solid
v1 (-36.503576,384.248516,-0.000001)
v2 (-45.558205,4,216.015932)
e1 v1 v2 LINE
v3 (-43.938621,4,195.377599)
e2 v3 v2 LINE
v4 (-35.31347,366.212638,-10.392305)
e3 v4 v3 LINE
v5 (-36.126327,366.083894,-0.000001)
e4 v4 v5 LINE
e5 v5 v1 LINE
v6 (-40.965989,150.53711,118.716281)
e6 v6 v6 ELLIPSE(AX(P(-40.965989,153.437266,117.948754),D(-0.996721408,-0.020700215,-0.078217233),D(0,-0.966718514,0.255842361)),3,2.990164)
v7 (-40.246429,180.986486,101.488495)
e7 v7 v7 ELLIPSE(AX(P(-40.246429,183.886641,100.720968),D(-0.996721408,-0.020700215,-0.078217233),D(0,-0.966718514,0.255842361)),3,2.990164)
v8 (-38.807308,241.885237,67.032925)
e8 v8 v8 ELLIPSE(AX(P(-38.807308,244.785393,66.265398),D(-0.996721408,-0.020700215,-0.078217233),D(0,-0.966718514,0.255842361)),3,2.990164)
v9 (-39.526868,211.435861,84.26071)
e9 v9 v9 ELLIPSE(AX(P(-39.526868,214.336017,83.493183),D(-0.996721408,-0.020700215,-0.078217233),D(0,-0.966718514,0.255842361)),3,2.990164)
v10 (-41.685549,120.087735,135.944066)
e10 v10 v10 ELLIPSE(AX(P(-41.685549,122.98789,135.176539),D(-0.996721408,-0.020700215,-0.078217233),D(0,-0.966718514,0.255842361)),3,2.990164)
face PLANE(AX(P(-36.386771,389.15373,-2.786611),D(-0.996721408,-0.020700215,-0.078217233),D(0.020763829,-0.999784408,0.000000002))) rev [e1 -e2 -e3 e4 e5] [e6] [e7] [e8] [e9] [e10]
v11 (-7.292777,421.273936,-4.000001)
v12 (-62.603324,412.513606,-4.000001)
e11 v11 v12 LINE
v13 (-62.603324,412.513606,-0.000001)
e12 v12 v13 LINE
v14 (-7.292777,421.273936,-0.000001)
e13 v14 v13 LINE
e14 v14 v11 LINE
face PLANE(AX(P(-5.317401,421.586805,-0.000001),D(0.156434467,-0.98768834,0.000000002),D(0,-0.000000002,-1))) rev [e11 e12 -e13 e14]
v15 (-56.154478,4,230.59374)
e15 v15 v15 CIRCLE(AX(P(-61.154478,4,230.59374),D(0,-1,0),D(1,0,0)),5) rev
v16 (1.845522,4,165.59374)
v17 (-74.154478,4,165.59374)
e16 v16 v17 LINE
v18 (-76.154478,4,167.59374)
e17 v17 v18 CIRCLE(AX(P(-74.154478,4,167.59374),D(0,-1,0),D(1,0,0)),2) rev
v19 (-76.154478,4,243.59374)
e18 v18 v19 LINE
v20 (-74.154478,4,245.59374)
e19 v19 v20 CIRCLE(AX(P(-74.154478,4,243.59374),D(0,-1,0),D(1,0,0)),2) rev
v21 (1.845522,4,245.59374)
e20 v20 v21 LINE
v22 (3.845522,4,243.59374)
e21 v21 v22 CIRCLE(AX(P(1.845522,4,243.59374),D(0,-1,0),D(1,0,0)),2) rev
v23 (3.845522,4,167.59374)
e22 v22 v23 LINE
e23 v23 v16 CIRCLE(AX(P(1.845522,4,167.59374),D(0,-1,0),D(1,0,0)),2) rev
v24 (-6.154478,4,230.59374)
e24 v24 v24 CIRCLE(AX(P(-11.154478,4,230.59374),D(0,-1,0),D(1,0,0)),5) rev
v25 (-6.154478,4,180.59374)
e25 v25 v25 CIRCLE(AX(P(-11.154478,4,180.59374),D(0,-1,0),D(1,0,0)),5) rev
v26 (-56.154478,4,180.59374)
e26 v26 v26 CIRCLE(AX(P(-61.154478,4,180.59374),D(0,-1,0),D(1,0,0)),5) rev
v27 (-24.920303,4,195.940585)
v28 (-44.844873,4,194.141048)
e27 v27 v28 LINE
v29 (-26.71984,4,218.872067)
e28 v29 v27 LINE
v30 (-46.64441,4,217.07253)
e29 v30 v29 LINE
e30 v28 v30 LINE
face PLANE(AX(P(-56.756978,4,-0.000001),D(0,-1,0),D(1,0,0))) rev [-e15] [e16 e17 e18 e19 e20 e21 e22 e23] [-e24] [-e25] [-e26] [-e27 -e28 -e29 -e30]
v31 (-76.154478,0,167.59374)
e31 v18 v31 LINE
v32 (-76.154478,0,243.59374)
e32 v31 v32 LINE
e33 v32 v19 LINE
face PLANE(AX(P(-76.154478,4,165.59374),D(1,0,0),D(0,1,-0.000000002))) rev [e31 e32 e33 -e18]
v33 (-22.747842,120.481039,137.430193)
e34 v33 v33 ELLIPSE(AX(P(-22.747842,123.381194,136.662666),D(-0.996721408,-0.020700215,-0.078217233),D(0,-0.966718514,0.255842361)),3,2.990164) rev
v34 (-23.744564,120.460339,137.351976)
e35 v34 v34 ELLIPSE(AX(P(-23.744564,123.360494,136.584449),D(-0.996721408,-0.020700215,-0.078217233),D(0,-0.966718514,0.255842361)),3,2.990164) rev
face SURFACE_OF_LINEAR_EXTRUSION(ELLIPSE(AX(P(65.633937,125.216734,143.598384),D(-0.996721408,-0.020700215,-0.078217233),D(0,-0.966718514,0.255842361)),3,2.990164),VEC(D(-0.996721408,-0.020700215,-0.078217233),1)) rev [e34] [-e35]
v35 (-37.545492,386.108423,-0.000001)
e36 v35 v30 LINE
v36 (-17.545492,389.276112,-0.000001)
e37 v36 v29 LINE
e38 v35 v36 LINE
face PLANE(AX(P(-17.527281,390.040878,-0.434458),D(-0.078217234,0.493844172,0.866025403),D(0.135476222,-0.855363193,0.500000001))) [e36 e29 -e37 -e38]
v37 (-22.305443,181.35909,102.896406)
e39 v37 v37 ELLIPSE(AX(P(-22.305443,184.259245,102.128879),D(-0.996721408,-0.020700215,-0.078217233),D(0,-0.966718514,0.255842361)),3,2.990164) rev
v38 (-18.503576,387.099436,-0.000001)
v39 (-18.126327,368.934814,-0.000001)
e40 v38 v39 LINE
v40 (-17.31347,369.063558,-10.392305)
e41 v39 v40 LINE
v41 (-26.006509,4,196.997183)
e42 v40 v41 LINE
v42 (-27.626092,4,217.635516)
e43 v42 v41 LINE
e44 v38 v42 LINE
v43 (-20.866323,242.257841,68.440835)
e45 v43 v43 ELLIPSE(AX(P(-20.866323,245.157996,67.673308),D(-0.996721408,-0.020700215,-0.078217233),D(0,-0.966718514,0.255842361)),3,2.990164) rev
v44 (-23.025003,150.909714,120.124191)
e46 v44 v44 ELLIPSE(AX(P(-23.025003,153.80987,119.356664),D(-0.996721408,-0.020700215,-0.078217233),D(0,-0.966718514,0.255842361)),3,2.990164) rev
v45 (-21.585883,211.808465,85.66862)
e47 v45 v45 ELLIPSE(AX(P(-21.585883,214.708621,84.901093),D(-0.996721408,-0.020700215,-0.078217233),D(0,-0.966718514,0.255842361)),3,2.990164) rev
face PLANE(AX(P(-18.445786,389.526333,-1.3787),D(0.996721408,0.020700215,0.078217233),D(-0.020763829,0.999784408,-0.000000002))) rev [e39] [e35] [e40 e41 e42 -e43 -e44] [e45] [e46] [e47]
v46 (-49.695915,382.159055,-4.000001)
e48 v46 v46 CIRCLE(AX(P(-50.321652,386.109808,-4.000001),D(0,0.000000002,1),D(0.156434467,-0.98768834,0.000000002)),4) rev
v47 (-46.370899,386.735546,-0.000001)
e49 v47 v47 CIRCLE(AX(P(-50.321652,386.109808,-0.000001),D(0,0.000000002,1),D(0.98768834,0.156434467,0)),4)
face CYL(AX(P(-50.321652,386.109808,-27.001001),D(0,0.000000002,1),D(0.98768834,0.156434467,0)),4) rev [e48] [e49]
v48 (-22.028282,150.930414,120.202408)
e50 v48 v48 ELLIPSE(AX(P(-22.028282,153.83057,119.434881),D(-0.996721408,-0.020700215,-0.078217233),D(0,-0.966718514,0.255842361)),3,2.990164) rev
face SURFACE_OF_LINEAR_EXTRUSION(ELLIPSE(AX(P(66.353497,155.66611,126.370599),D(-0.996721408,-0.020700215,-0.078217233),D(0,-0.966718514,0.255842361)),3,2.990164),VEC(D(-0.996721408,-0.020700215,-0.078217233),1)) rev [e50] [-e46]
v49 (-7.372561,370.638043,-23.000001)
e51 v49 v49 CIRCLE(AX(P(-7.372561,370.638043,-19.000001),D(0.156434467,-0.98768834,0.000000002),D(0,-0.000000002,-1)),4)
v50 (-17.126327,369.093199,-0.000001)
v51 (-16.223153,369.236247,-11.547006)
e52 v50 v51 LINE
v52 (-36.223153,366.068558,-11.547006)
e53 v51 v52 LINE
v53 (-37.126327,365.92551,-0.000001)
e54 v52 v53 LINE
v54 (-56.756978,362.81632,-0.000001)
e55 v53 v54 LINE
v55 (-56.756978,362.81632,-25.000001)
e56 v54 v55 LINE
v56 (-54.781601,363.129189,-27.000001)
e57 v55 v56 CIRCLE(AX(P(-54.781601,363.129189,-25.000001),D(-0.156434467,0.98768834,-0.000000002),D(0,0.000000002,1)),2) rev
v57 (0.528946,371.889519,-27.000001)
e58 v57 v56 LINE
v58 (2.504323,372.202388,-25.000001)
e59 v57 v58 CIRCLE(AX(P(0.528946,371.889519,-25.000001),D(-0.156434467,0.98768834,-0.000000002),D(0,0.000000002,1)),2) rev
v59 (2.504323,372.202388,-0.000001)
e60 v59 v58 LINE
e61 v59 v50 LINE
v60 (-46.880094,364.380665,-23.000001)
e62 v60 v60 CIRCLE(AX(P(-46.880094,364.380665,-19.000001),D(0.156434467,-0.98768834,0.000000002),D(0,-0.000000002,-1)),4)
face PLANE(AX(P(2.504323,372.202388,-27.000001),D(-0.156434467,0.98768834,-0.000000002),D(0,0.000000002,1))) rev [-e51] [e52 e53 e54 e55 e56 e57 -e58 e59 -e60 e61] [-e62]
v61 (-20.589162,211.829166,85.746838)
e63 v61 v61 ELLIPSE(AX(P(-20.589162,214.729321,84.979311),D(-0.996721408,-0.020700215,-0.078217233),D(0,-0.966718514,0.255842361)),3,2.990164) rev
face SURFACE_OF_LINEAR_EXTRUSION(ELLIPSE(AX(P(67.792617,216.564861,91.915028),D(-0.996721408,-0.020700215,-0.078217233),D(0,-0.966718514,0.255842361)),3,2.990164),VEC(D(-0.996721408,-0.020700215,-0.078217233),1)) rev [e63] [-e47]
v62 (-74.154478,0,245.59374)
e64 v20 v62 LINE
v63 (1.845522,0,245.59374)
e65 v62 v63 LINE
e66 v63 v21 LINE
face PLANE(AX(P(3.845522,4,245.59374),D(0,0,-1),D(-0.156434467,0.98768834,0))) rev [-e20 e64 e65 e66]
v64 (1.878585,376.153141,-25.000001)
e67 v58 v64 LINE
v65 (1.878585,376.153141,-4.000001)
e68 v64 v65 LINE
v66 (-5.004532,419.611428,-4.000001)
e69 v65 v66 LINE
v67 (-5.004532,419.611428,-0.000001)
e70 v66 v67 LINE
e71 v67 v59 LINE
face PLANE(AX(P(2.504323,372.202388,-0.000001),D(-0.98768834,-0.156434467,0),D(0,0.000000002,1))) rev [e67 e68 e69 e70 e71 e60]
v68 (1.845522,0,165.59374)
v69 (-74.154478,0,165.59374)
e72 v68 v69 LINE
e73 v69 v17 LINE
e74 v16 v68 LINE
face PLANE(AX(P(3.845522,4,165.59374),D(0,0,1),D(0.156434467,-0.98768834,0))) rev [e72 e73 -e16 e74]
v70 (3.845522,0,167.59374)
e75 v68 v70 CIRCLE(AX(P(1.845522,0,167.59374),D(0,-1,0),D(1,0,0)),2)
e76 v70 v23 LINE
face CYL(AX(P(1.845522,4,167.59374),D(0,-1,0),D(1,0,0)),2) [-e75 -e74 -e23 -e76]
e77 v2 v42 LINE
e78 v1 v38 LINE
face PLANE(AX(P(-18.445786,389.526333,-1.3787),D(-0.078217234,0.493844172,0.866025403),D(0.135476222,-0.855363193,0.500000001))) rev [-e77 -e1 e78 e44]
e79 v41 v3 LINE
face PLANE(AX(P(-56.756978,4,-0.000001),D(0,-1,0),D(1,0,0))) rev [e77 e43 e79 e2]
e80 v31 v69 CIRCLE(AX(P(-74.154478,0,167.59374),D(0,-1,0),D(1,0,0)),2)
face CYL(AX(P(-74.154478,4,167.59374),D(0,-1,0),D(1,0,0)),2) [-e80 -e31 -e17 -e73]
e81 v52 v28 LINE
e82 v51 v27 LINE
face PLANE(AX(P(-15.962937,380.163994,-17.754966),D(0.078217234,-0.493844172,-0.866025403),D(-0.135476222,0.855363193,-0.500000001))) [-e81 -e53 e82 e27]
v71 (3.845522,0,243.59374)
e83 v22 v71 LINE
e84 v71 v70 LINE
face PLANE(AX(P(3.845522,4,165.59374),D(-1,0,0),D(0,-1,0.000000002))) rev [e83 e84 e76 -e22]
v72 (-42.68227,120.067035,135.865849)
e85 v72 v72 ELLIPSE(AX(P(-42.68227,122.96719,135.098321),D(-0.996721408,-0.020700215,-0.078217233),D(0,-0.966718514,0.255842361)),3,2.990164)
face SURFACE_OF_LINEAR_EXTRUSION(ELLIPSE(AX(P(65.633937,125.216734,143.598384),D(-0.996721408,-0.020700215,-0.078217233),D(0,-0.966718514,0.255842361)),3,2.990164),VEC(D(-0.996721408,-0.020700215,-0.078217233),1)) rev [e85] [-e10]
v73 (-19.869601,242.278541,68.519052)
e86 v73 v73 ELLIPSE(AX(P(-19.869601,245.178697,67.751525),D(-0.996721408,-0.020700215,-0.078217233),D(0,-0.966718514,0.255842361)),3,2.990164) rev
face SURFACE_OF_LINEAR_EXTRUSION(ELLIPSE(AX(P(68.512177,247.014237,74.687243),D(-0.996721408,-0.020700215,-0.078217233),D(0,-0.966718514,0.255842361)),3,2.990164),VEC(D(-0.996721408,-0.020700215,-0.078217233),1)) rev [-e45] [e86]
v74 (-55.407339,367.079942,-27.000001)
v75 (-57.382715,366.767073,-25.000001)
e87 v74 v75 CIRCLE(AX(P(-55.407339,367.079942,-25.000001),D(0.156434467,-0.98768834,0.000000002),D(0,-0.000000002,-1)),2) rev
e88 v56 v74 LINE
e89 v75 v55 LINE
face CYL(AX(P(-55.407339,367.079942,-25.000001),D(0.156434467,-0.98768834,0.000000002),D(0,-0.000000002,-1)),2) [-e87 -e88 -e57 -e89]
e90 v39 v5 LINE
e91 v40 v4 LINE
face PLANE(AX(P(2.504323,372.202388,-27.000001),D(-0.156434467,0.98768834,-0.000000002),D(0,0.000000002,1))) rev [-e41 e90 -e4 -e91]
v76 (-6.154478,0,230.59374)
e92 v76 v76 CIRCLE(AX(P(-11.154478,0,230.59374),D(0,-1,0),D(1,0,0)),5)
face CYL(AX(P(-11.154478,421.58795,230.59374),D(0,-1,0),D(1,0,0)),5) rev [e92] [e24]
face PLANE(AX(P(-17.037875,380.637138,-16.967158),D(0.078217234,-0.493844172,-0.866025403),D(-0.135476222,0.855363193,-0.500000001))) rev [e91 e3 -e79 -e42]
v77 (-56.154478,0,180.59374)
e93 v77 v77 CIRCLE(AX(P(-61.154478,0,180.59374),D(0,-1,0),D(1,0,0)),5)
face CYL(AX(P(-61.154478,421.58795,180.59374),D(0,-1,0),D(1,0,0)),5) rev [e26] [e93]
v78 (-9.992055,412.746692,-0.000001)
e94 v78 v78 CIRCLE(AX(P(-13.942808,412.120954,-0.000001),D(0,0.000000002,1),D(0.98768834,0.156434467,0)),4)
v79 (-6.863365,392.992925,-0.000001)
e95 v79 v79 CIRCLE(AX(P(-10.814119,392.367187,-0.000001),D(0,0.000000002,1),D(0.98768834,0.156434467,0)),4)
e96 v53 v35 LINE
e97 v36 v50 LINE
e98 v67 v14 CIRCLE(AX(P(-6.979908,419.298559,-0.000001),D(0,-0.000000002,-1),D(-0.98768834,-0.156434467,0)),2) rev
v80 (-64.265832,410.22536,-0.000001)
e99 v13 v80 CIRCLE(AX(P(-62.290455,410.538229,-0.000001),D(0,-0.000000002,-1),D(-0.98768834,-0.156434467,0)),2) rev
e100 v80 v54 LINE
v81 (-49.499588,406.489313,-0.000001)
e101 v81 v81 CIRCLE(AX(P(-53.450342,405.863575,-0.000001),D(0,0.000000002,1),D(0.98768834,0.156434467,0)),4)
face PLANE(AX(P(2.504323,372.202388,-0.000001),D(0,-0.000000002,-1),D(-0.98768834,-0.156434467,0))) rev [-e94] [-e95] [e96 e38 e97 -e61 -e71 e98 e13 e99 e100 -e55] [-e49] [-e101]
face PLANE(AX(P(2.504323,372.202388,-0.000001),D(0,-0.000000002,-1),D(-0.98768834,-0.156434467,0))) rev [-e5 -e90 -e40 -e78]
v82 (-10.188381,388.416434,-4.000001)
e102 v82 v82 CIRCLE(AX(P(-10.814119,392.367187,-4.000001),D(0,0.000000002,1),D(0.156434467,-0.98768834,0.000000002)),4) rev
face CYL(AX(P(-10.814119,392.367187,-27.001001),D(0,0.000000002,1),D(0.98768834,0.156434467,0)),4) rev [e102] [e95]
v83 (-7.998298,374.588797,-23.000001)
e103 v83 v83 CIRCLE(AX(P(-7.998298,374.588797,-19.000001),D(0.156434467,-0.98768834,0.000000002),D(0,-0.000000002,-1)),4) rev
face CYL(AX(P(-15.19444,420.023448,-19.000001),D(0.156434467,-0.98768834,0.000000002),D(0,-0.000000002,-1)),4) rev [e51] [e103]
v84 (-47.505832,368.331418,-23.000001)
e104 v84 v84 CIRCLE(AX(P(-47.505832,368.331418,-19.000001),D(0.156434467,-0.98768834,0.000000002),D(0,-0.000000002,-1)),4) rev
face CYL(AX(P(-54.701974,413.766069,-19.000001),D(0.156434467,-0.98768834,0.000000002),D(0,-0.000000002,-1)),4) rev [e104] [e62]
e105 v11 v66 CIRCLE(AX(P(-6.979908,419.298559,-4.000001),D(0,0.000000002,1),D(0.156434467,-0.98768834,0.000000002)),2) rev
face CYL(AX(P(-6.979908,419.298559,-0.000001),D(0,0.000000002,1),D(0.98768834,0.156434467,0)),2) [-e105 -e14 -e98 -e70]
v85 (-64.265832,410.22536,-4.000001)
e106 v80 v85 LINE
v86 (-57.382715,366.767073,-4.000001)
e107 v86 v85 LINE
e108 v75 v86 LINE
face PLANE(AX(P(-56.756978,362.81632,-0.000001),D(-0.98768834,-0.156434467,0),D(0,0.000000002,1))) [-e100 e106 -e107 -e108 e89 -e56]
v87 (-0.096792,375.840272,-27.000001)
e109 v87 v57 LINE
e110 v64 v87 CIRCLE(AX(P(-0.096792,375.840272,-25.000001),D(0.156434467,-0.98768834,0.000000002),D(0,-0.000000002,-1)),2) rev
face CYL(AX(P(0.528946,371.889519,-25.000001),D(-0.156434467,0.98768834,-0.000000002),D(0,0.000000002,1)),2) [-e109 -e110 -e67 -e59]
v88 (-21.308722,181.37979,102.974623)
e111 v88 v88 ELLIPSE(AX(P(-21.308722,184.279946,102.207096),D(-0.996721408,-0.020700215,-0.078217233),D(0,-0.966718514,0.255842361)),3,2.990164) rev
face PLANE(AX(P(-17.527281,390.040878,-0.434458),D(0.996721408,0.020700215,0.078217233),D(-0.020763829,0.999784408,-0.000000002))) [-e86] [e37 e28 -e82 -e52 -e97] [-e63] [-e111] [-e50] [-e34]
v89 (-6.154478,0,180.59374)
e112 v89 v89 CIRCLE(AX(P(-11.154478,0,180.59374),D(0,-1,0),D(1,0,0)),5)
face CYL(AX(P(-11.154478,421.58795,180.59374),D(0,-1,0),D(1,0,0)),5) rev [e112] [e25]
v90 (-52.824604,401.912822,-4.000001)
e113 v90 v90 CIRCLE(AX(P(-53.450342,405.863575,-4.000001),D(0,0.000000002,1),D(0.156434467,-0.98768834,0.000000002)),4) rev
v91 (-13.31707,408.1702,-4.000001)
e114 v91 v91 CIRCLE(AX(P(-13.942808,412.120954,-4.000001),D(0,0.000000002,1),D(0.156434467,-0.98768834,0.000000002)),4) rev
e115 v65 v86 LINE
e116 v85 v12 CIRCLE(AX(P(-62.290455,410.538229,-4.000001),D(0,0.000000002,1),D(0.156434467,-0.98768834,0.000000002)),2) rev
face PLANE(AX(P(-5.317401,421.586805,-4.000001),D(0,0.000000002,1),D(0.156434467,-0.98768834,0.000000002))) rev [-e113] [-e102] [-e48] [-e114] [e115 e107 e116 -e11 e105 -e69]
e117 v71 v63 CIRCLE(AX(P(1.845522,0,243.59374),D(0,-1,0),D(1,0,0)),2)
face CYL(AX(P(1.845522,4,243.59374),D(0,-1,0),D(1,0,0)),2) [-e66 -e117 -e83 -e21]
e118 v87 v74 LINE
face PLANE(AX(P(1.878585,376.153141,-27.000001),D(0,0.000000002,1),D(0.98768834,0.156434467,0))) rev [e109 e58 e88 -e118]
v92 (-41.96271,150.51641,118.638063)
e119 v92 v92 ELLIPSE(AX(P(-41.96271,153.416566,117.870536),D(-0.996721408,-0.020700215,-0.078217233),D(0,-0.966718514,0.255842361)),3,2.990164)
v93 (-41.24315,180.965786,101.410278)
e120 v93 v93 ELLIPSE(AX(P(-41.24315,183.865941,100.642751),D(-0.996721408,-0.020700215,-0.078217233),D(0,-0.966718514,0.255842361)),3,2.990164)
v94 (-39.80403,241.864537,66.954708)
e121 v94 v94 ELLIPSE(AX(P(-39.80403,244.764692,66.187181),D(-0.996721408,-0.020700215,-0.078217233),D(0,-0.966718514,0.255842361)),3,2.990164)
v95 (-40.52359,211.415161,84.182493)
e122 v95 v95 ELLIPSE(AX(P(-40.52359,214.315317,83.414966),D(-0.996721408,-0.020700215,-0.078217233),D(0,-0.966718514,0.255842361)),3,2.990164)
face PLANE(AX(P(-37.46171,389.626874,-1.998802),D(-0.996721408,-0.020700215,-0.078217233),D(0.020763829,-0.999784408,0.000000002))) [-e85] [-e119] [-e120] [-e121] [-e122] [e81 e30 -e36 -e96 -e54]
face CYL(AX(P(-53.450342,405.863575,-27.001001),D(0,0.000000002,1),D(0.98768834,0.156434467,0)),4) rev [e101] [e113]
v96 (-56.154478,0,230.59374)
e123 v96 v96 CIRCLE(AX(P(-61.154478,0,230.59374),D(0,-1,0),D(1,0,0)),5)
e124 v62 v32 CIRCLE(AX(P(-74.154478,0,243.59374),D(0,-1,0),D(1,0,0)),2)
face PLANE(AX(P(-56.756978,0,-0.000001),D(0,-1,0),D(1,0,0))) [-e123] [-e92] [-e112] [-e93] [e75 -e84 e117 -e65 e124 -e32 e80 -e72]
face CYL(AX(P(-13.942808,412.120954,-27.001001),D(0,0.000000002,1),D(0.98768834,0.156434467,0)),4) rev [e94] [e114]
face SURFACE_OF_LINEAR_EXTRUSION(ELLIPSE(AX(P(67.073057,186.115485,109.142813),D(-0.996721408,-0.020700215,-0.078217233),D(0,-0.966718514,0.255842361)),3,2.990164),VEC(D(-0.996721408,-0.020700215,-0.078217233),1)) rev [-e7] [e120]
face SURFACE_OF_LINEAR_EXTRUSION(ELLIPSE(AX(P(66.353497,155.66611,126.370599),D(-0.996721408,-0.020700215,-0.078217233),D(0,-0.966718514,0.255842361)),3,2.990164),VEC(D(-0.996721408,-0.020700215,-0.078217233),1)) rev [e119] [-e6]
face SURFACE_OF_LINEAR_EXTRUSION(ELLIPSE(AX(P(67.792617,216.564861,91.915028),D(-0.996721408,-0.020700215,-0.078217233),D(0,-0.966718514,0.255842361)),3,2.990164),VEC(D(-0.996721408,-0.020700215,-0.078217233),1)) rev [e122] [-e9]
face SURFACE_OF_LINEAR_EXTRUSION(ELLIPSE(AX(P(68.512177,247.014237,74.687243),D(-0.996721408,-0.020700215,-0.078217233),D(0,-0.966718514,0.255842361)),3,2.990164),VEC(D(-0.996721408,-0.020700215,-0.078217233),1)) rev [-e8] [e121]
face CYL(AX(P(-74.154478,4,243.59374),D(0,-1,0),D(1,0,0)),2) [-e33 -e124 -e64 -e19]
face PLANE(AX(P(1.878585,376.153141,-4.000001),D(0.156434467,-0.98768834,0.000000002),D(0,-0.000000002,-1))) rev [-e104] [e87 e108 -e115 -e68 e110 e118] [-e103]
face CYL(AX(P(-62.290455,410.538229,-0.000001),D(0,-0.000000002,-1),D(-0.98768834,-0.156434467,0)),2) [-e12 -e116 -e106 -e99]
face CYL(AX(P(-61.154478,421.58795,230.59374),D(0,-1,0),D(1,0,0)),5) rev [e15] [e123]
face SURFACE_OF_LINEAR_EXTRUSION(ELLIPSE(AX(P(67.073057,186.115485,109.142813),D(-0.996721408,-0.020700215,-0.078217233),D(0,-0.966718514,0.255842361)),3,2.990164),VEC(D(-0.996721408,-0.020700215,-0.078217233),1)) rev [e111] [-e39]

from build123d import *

# Parameters (mm, degrees)
BOSS_EXTRUDE1_DEPTH      = 60
BOSS_EXTRUDE2_DEPTH      = 500
BOSS_EXTRUDE2_DEPTH_BACK = 20
CUT_EXTRUDE1_DEPTH       = 60
BOSS_EXTRUDE3_DEPTH      = 4
SKETCH7_W                = 66.53307322741853
SKETCH7_H                = 100.00000000000006
CUT_EXTRUDE2_DEPTH       = 100
CUT_EXTRUDE3_REACH       = 450.752
SKETCH8_R                = 3.999999996290614
SKETCH8_R_2              = 3.999999996290612
SKETCH8_R_3              = 3.999999996290599
SKETCH8_R_4              = 3.9999999962905974
CUT_EXTRUDE4_REACH       = 450.752
SKETCH9_R                = 4.000000002943936
SKETCH9_R_2              = 4.000000002943917
CUT_EXTRUDE5_REACH       = 492.61
SKETCH10_R               = 5.000000000000006
SKETCH10_R_2             = 5.000000000000005
FILLET1_R                = 2
FILLET2_R                = 2
SKETCH11_RX              = 3.0000000000000298
SKETCH11_RY              = 2.9901642246261853
SKETCH11_RY_2            = 2.990164224626172
SKETCH11_RX_2            = 3.000000000000057
SKETCH11_RX_3            = 3.0000000000000533
SKETCH11_RX_4            = 3.0000000000000058
SKETCH11_RY_3            = 2.9901642246261186
CUT_EXTRUDE6_DEPTH       = 450.440489599581
BODY_MOVE_COPY1_ANGLE    = 9.0000001


with BuildPart() as part:
    # Sketch1 → Boss-Extrude1 (new body)
    with BuildSketch(Plane(origin=(0, 0, 0), x_dir=(0, 0, -1), z_dir=(1, 0, 0))):
        Polygon((0, 0), (0, 50), (4, 50), (4.000000000000005, 4), (27, 4), (27, -2.82e-15), align=None)
    extrude(amount=BOSS_EXTRUDE1_DEPTH)

    # Sketch3 → Boss-Extrude2 (add, two sides: drawn at the far end of the back side and taken through both)
    with BuildSketch(Plane(origin=(0.7341522555726998, 4.014248509947268, -2.3176274578121165), x_dir=(0, -0.5000000000000011, -0.8660254037844382), z_dir=(-0.15643446504023129, -0.8553631939770857, 0.49384417029756994)).offset(-BOSS_EXTRUDE2_DEPTH_BACK)):
        Polygon((-10, 39.63065021785413), (10, 39.63065021785413), (10.000000000000002, 19.630650217854132), (-9.999999999999998, 19.630650217854132), align=None)
        Polygon((-9.000000000000002, 38.63065021785413), (9.000000000000002, 38.63065021785413), (9.000000000000005, 20.630650217854136), (-9, 20.630650217854136), align=None, mode=Mode.SUBTRACT)
    extrude(amount=BOSS_EXTRUDE2_DEPTH + BOSS_EXTRUDE2_DEPTH_BACK)

    # Sketch4 → Cut-Extrude1 (cut)
    with BuildSketch(Plane.ZY):
        Polygon((-4.000000000000005, 3.9999999999999947), (-4.000000000000005, 34.425897354185985), (-31.38403913433122, 4), align=None)
    extrude(amount=-CUT_EXTRUDE1_DEPTH, mode=Mode.SUBTRACT)

    # Sketch6 → Boss-Extrude3 (add)
    with BuildSketch(Plane(origin=(-56.75697758695906, -358.3494490271577, -6.0350178588e-07), x_dir=(0.9876883403131397, -0.15643446682069626, -2.634536772853159e-10), z_dir=(0.15643446682069626, 0.9876883403131398, 1.663381034600109e-09))):
        Polygon((60.60249934727371, -165.5937403388422), (-19.397500652726297, -165.5937403388422), (-19.397500652726286, -245.5937403388422), (60.602499347273714, -245.5937403388422), align=None)
    extrude(amount=BOSS_EXTRUDE3_DEPTH)

    # Sketch7 → Cut-Extrude2 (cut)
    with BuildSketch(Plane(origin=(-56.75697758695889, -358.34944902715785, -6.0350179691e-07), x_dir=(0.9876883403131398, -0.15643446682069573, -2.6345368210226206e-10), z_dir=(-0.15643446682069573, -0.9876883403131398, -1.6633810650131218e-09))):
        with Locations((19.033988730271286, 218.77379525877697)):
            Rectangle(SKETCH7_W, SKETCH7_H)
    extrude(amount=CUT_EXTRUDE2_DEPTH, mode=Mode.SUBTRACT)

    # Sketch8 → Cut-Extrude3 (cut, up to next)
    with BuildSketch(Plane.XY, mode=Mode.PRIVATE) as cut_extrude3_sk1:
        with Locations((10.000000000000002, 21.999999999999982)):
            Circle(SKETCH8_R)
    cut_extrude3_tool1 = extrude(cut_extrude3_sk1.sketch, amount=-CUT_EXTRUDE3_REACH, mode=Mode.PRIVATE) & part.part
    # Sketch8 → Cut-Extrude3 (cut, up to next)
    with BuildSketch(Plane.XY, mode=Mode.PRIVATE) as cut_extrude3_sk2:
        with Locations((50.00000000000001, 21.999999999999975)):
            Circle(SKETCH8_R_2)
    cut_extrude3_tool2 = extrude(cut_extrude3_sk2.sketch, amount=-CUT_EXTRUDE3_REACH, mode=Mode.PRIVATE) & part.part
    # Sketch8 → Cut-Extrude3 (cut, up to next)
    with BuildSketch(Plane.XY, mode=Mode.PRIVATE) as cut_extrude3_sk3:
        with Locations((50.00000000000001, 41.999999999999964)):
            Circle(SKETCH8_R_3)
    cut_extrude3_tool3 = extrude(cut_extrude3_sk3.sketch, amount=-CUT_EXTRUDE3_REACH, mode=Mode.PRIVATE) & part.part
    # Sketch8 → Cut-Extrude3 (cut, up to next)
    with BuildSketch(Plane.XY, mode=Mode.PRIVATE) as cut_extrude3_sk4:
        with Locations((10.000000000000009, 41.99999999999998)):
            Circle(SKETCH8_R_4)
    cut_extrude3_tool4 = extrude(cut_extrude3_sk4.sketch, amount=-CUT_EXTRUDE3_REACH, mode=Mode.PRIVATE) & part.part
    add(cut_extrude3_tool1.solids().sort_by_distance((10, 22, 0))[0], mode=Mode.SUBTRACT)
    add(cut_extrude3_tool2.solids().sort_by_distance((50, 22, 0))[0], mode=Mode.SUBTRACT)
    add(cut_extrude3_tool3.solids().sort_by_distance((50, 42, 0))[0], mode=Mode.SUBTRACT)
    add(cut_extrude3_tool4.solids().sort_by_distance((10, 42, 0))[0], mode=Mode.SUBTRACT)

    # Sketch9 → Cut-Extrude4 (cut, up to next)
    with BuildSketch(Plane.XZ, mode=Mode.PRIVATE) as cut_extrude4_sk1:
        with Locations(Location((50, -18.999999999999968, 0), (0, 0, 270))):
            Circle(SKETCH9_R)
    cut_extrude4_tool1 = extrude(cut_extrude4_sk1.sketch, amount=-CUT_EXTRUDE4_REACH, mode=Mode.PRIVATE) & part.part
    # Sketch9 → Cut-Extrude4 (cut, up to next)
    with BuildSketch(Plane.XZ, mode=Mode.PRIVATE) as cut_extrude4_sk2:
        with Locations(Location((10.000000000000002, -18.999999999999968, 0), (0, 0, 270))):
            Circle(SKETCH9_R_2)
    cut_extrude4_tool2 = extrude(cut_extrude4_sk2.sketch, amount=-CUT_EXTRUDE4_REACH, mode=Mode.PRIVATE) & part.part
    add(cut_extrude4_tool1.solids().sort_by_distance((50, 0, -19))[0], mode=Mode.SUBTRACT)
    add(cut_extrude4_tool2.solids().sort_by_distance((10, 0, -19))[0], mode=Mode.SUBTRACT)

    # Sketch10 → Cut-Extrude5 (cut, up to next)
    with BuildSketch(Plane(origin=(-56.75697758695889, -358.34944902715785, -6.0350179691e-07), x_dir=(0.9876883403131398, -0.15643446682069573, -2.6345368210226206e-10), z_dir=(-0.15643446682069573, -0.9876883403131398, -1.6633810650131218e-09)), mode=Mode.PRIVATE) as cut_extrude5_sk1:
        with Locations((-4.397500652726306, 230.59374033884228)):
            Circle(SKETCH10_R)
    cut_extrude5_tool1 = extrude(cut_extrude5_sk1.sketch, amount=-CUT_EXTRUDE5_REACH, mode=Mode.PRIVATE) & part.part
    # Sketch10 → Cut-Extrude5 (cut, up to next)
    with BuildSketch(Plane(origin=(-56.75697758695889, -358.34944902715785, -6.0350179691e-07), x_dir=(0.9876883403131398, -0.15643446682069573, -2.6345368210226206e-10), z_dir=(-0.15643446682069573, -0.9876883403131398, -1.6633810650131218e-09)), mode=Mode.PRIVATE) as cut_extrude5_sk2:
        with Locations((45.6024993472737, 230.59374033884228)):
            Circle(SKETCH10_R_2)
    cut_extrude5_tool2 = extrude(cut_extrude5_sk2.sketch, amount=-CUT_EXTRUDE5_REACH, mode=Mode.PRIVATE) & part.part
    # Sketch10 → Cut-Extrude5 (cut, up to next)
    with BuildSketch(Plane(origin=(-56.75697758695889, -358.34944902715785, -6.0350179691e-07), x_dir=(0.9876883403131398, -0.15643446682069573, -2.6345368210226206e-10), z_dir=(-0.15643446682069573, -0.9876883403131398, -1.6633810650131218e-09)), mode=Mode.PRIVATE) as cut_extrude5_sk3:
        with Locations((45.60249934727421, 180.59374033884228)):
            Circle(SKETCH10_R_2)
    cut_extrude5_tool3 = extrude(cut_extrude5_sk3.sketch, amount=-CUT_EXTRUDE5_REACH, mode=Mode.PRIVATE) & part.part
    # Sketch10 → Cut-Extrude5 (cut, up to next)
    with BuildSketch(Plane(origin=(-56.75697758695889, -358.34944902715785, -6.0350179691e-07), x_dir=(0.9876883403131398, -0.15643446682069573, -2.6345368210226206e-10), z_dir=(-0.15643446682069573, -0.9876883403131398, -1.6633810650131218e-09)), mode=Mode.PRIVATE) as cut_extrude5_sk4:
        with Locations((-4.397500652725782, 180.59374033884228)):
            Circle(SKETCH10_R)
    cut_extrude5_tool4 = extrude(cut_extrude5_sk4.sketch, amount=-CUT_EXTRUDE5_REACH, mode=Mode.PRIVATE) & part.part
    add(cut_extrude5_tool1.solids().sort_by_distance((-61.100338, -357.661529, 230.59374))[0], mode=Mode.SUBTRACT)
    add(cut_extrude5_tool2.solids().sort_by_distance((-11.715921, -365.483252, 230.59374))[0], mode=Mode.SUBTRACT)
    add(cut_extrude5_tool3.solids().sort_by_distance((-11.715921, -365.483252, 180.59374))[0], mode=Mode.SUBTRACT)
    add(cut_extrude5_tool4.solids().sort_by_distance((-61.100338, -357.661529, 180.59374))[0], mode=Mode.SUBTRACT)

    # Fillet1
    fillet1_edges = [part.edges().sort_by_distance(p)[0] for p in [
        (-75.60279387923194, -353.339634953147, 165.59373974377752),
        (-75.60279387923194, -353.3396350878763, 245.59373974377752),
        (3.412273345819247, -365.8543924335319, 245.59373972270123),
        (3.41227334581924, -365.85439229880274, 165.59373972270123),
    ]]
    fillet(fillet1_edges, radius=FILLET1_R)

    # Fillet2
    fillet2_edges = [part.edges().sort_by_distance(p)[0] for p in [
        (60, 50, -2),
        (0, 50, -2),
        (60, 1.9999999999999987, -27),
        (0, 1.9999999999999987, -27),
    ]]
    fillet(fillet2_edges, radius=FILLET2_R)

    # Sketch11 → Cut-Extrude6 (cut, through all)
    with BuildSketch(Plane(origin=(19.38896433847594, -2.659486302424582, 1.5354551326109596), x_dir=(-0.07749165674017884, 0.010629139135798351, 0.9969363392598818), z_dir=(-0.9876883405951378, 0.13547622075226887, -0.07821723252011582))):
        with Locations(Location((133.97331535443402, -240.08966554254275), (0, 0, -75.12989222147398))):
            Ellipse(SKETCH11_RX, SKETCH11_RY)
        with Locations(Location((116.69258792381987, -209.6617954111425), (0, 0, -75.12989222147398))):
            Ellipse(SKETCH11_RX, SKETCH11_RY_2)
        with Locations(Location((99.41186049320605, -179.23392527974212), (0, 0, -75.12989222147412))):
            Ellipse(SKETCH11_RX_2, SKETCH11_RY_2)
        with Locations(Location((82.13113306259201, -148.8060551483421), (0, 0, -75.12989222147439))):
            Ellipse(SKETCH11_RX_3, SKETCH11_RY_2)
        with Locations(Location((64.85040563197819, -118.37818501694186), (0, 0, -75.12989222147358))):
            Ellipse(SKETCH11_RX_4, SKETCH11_RY_3)
    extrude(amount=-CUT_EXTRUDE6_DEPTH, mode=Mode.SUBTRACT)


with BuildPart() as part_1:
    # Body-Move/Copy1: read off the stored shape, not the designer's step
    # Body-Move/Copy1: moved
    add(part.part.moved(Location((0.6987726, 367.2281966, 0))).rotate(Axis((0, 0, 0), (-1.06e-08, 0, 1.0)), BODY_MOVE_COPY1_ANGLE))


solid = part_1.part
